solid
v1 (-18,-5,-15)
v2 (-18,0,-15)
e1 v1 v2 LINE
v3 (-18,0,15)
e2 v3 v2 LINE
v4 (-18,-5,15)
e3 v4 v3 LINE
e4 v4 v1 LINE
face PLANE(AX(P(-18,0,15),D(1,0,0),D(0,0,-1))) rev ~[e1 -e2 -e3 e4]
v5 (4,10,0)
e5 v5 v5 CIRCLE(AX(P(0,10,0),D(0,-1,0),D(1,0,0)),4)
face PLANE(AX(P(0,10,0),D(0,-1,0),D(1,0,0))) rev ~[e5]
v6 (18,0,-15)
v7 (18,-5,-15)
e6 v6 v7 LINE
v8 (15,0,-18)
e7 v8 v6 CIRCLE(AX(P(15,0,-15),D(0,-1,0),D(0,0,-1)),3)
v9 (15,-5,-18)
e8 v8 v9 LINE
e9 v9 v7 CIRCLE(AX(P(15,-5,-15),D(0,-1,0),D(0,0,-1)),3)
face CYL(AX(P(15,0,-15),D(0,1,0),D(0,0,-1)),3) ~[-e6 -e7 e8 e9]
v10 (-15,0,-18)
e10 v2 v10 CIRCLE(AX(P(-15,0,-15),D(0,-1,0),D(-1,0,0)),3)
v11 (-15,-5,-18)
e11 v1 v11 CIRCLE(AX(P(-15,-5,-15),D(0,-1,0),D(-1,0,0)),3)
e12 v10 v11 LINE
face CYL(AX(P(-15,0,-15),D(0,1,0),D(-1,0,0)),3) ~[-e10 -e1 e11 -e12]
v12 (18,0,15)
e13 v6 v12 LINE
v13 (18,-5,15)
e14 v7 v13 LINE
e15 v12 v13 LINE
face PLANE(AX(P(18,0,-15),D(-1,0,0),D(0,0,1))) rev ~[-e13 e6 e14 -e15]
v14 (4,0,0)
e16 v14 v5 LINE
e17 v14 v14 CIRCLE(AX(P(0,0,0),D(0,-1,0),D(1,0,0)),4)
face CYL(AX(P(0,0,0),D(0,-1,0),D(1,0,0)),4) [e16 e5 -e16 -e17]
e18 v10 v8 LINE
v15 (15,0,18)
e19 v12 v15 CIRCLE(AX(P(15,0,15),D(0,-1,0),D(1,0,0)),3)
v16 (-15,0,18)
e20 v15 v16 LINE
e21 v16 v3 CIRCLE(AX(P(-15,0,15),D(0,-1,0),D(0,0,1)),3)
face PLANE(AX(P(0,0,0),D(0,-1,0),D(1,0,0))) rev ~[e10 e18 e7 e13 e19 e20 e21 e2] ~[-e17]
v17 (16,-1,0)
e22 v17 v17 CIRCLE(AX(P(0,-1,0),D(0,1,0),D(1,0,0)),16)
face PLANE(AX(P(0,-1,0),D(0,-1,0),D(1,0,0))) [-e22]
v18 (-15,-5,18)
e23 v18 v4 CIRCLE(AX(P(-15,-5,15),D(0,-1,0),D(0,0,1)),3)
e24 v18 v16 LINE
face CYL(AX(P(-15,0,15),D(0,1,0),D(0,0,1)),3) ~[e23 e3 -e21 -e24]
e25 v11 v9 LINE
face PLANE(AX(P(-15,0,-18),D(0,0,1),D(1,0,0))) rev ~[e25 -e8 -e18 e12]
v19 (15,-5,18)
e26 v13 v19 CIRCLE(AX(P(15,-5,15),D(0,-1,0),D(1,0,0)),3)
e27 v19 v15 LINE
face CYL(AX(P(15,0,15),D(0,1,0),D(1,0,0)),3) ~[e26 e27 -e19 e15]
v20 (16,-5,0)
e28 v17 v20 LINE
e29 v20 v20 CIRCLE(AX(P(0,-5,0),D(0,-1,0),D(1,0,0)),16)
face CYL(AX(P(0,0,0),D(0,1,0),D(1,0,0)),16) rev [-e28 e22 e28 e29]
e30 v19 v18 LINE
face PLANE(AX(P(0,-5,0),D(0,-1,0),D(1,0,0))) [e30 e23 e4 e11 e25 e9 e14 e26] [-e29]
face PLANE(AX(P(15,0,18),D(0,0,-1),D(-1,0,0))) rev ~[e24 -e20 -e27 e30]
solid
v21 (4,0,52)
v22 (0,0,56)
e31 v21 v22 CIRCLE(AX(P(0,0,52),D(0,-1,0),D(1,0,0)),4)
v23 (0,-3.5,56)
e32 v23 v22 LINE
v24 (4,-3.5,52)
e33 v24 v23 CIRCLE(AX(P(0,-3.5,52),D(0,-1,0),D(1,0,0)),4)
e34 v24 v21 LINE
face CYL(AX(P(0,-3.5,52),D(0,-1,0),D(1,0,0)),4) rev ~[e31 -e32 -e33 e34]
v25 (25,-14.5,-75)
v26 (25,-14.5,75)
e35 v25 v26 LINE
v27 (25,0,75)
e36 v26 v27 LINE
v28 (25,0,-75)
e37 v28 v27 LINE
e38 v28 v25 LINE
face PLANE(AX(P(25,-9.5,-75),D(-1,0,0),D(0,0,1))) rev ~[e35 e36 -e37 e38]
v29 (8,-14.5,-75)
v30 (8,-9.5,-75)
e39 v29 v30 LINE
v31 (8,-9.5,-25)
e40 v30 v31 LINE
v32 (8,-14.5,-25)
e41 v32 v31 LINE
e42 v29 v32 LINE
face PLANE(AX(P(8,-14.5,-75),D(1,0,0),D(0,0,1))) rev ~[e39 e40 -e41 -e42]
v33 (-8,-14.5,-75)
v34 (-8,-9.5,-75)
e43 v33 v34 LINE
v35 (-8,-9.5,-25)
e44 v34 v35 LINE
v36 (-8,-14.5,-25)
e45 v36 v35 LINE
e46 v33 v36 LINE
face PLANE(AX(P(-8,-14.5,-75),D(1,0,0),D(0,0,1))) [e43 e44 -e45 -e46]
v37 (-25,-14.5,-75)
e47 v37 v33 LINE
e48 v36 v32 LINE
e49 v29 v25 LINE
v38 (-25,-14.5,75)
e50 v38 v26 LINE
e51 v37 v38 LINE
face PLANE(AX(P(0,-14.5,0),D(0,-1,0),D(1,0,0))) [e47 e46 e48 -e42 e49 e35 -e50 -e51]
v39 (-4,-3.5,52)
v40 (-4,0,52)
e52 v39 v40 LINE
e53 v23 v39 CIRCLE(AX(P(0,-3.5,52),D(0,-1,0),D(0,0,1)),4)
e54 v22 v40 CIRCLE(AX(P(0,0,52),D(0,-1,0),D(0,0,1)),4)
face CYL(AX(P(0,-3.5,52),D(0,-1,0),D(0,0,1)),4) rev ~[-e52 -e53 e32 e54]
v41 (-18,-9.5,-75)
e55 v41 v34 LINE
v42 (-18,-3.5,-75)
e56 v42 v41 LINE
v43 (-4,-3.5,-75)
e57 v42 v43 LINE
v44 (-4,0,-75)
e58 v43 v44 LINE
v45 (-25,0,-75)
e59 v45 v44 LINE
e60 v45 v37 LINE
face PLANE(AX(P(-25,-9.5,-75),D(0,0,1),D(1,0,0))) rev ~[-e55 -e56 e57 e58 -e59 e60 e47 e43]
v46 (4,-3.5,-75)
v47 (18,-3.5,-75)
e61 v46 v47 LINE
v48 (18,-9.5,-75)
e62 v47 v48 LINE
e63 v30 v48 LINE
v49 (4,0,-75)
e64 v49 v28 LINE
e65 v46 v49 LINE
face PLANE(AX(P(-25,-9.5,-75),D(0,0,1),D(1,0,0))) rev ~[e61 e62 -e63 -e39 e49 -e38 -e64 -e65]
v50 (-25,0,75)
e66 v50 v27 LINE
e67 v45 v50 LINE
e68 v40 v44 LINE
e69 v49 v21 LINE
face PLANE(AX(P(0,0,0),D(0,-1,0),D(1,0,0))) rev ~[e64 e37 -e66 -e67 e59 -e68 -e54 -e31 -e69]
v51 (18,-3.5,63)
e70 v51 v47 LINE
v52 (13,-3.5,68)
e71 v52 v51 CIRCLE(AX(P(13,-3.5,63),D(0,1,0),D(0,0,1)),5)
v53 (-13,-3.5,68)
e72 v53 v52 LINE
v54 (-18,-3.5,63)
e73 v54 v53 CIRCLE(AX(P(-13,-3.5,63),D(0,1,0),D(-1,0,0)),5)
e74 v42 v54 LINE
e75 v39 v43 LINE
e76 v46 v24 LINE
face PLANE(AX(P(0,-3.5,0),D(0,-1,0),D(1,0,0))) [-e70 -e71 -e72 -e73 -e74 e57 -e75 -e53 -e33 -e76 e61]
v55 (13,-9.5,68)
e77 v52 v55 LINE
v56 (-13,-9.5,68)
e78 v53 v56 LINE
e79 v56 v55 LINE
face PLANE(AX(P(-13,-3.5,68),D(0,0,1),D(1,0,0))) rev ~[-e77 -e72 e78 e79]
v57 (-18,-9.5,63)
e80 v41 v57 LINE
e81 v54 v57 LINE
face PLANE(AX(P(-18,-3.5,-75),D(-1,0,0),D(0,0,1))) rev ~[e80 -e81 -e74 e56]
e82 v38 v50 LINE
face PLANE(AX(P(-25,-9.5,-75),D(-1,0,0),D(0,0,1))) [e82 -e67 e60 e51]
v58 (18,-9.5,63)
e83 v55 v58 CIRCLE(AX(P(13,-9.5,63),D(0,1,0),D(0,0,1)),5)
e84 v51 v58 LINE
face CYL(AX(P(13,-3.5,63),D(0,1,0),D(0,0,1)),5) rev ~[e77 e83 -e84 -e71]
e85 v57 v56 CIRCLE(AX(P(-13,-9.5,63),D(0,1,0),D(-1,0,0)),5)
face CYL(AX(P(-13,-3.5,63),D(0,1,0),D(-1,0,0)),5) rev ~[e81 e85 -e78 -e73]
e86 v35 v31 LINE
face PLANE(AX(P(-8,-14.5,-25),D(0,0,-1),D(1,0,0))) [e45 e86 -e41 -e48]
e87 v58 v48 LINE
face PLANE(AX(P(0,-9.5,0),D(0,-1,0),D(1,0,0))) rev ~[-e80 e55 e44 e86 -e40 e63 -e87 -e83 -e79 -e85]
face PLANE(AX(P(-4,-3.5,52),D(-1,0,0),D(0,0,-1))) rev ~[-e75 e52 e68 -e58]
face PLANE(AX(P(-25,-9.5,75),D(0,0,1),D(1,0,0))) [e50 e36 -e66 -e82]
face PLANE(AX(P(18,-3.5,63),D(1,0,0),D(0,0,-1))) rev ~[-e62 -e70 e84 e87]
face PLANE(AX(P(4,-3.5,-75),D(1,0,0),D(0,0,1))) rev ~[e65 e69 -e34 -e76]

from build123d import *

# Parameters (mm, degrees)
F0_W      = 50
F0_H      = 150
F1_DEPTH  = 3.5
F3_DEPTH  = 6
F4_DEPTH  = 25
F5_W      = 50
F5_H      = 150
F6_DEPTH  = 5
F7_R      = 16
F7_R_2    = 4
F8_DEPTH  = 1
F9_DEPTH  = 5
F10_DEPTH = 10
F11_W     = 16
F11_H     = 50
F12_DEPTH = 6.1


with BuildPart() as f1:
    # F0 (on Front) → F1 (new body)
    with BuildSketch(Plane.XZ):
        Rectangle(F0_W, F0_H)
    extrude(amount=F1_DEPTH)

    # F2 (on face) → F3 (join)
    with BuildSketch(Plane.XZ.offset(3.5)):
        with BuildLine():
            Line((-13, 68), (13, 68))
            ThreePointArc((13, 68), (16.5355339059, 66.5355339059), (18, 63))
            Line((18, 63), (18, -68))
            Line((18, -68), (18, -75))
            Line((18, -75), (25, -75))
            Line((25, -75), (25, 75))
            Line((25, 75), (-25, 75))
            Line((-25, 75), (-25, -75))
            Line((-25, -75), (-18, -75))
            Line((-18, -75), (-18, -68))
            Line((-18, -68), (-18, 63))
            ThreePointArc((-18, 63), (-16.5355339059, 66.5355339059), (-13, 68))
        make_face()
    extrude(amount=F3_DEPTH)

    # F2 (on face) → F4 (cut)
    with BuildSketch(Plane.XZ.offset(3.5)):
        with BuildLine():
            Line((-4, -75), (4, -75))
            Line((4, -75), (4, 52))
            ThreePointArc((4, 52), (2.8284271247, 54.8284271247), (0, 56))
            ThreePointArc((0, 56), (-2.8284271247, 54.8284271247), (-4, 52))
            Line((-4, 52), (-4, -75))
        make_face()
    extrude(amount=-F4_DEPTH, mode=Mode.SUBTRACT)

    # F5 (on face) → F6 (join)
    with BuildSketch(Plane.XZ.offset(9.5)):
        Rectangle(F5_W, F5_H)
    extrude(amount=F6_DEPTH)

    # F11 (on face) → F12 (cut)
    with BuildSketch(Plane.XZ.offset(14.5)):
        with Locations((0, -50)):
            Rectangle(F11_W, F11_H)
    extrude(amount=-F12_DEPTH, mode=Mode.SUBTRACT)


with BuildPart() as f8:
    # F7 (on Front) → F8 (new body)
    with BuildSketch(Plane.XZ):
        with BuildLine():
            ThreePointArc((-18, -15), (-17.1213203436, -17.1213203436), (-15, -18))
            Line((-15, -18), (15, -18))
            ThreePointArc((15, -18), (17.1213203436, -17.1213203436), (18, -15))
            Line((18, -15), (18, 15))
            ThreePointArc((18, 15), (17.1213203436, 17.1213203436), (15, 18))
            Line((15, 18), (-15, 18))
            ThreePointArc((-15, 18), (-17.1213203436, 17.1213203436), (-18, 15))
            Line((-18, 15), (-18, -15))
        make_face()
        Circle(F7_R, mode=Mode.SUBTRACT)
        Circle(F7_R)
        Circle(F7_R_2, mode=Mode.SUBTRACT)
        Circle(F7_R_2)
    extrude(amount=F8_DEPTH)

    # F7 (on Front) → F9 (join)
    with BuildSketch(Plane.XZ):
        with BuildLine():
            ThreePointArc((-18, -15), (-17.1213203436, -17.1213203436), (-15, -18))
            Line((-15, -18), (15, -18))
            ThreePointArc((15, -18), (17.1213203436, -17.1213203436), (18, -15))
            Line((18, -15), (18, 15))
            ThreePointArc((18, 15), (17.1213203436, 17.1213203436), (15, 18))
            Line((15, 18), (-15, 18))
            ThreePointArc((-15, 18), (-17.1213203436, 17.1213203436), (-18, 15))
            Line((-18, 15), (-18, -15))
        make_face()
        Circle(F7_R, mode=Mode.SUBTRACT)
    extrude(amount=F9_DEPTH)

    # F7 (on Front) → F10 (join)
    with BuildSketch(Plane.XZ):
        Circle(F7_R_2)
    extrude(amount=-F10_DEPTH)


solid = Compound([f1.part, f8.part])
